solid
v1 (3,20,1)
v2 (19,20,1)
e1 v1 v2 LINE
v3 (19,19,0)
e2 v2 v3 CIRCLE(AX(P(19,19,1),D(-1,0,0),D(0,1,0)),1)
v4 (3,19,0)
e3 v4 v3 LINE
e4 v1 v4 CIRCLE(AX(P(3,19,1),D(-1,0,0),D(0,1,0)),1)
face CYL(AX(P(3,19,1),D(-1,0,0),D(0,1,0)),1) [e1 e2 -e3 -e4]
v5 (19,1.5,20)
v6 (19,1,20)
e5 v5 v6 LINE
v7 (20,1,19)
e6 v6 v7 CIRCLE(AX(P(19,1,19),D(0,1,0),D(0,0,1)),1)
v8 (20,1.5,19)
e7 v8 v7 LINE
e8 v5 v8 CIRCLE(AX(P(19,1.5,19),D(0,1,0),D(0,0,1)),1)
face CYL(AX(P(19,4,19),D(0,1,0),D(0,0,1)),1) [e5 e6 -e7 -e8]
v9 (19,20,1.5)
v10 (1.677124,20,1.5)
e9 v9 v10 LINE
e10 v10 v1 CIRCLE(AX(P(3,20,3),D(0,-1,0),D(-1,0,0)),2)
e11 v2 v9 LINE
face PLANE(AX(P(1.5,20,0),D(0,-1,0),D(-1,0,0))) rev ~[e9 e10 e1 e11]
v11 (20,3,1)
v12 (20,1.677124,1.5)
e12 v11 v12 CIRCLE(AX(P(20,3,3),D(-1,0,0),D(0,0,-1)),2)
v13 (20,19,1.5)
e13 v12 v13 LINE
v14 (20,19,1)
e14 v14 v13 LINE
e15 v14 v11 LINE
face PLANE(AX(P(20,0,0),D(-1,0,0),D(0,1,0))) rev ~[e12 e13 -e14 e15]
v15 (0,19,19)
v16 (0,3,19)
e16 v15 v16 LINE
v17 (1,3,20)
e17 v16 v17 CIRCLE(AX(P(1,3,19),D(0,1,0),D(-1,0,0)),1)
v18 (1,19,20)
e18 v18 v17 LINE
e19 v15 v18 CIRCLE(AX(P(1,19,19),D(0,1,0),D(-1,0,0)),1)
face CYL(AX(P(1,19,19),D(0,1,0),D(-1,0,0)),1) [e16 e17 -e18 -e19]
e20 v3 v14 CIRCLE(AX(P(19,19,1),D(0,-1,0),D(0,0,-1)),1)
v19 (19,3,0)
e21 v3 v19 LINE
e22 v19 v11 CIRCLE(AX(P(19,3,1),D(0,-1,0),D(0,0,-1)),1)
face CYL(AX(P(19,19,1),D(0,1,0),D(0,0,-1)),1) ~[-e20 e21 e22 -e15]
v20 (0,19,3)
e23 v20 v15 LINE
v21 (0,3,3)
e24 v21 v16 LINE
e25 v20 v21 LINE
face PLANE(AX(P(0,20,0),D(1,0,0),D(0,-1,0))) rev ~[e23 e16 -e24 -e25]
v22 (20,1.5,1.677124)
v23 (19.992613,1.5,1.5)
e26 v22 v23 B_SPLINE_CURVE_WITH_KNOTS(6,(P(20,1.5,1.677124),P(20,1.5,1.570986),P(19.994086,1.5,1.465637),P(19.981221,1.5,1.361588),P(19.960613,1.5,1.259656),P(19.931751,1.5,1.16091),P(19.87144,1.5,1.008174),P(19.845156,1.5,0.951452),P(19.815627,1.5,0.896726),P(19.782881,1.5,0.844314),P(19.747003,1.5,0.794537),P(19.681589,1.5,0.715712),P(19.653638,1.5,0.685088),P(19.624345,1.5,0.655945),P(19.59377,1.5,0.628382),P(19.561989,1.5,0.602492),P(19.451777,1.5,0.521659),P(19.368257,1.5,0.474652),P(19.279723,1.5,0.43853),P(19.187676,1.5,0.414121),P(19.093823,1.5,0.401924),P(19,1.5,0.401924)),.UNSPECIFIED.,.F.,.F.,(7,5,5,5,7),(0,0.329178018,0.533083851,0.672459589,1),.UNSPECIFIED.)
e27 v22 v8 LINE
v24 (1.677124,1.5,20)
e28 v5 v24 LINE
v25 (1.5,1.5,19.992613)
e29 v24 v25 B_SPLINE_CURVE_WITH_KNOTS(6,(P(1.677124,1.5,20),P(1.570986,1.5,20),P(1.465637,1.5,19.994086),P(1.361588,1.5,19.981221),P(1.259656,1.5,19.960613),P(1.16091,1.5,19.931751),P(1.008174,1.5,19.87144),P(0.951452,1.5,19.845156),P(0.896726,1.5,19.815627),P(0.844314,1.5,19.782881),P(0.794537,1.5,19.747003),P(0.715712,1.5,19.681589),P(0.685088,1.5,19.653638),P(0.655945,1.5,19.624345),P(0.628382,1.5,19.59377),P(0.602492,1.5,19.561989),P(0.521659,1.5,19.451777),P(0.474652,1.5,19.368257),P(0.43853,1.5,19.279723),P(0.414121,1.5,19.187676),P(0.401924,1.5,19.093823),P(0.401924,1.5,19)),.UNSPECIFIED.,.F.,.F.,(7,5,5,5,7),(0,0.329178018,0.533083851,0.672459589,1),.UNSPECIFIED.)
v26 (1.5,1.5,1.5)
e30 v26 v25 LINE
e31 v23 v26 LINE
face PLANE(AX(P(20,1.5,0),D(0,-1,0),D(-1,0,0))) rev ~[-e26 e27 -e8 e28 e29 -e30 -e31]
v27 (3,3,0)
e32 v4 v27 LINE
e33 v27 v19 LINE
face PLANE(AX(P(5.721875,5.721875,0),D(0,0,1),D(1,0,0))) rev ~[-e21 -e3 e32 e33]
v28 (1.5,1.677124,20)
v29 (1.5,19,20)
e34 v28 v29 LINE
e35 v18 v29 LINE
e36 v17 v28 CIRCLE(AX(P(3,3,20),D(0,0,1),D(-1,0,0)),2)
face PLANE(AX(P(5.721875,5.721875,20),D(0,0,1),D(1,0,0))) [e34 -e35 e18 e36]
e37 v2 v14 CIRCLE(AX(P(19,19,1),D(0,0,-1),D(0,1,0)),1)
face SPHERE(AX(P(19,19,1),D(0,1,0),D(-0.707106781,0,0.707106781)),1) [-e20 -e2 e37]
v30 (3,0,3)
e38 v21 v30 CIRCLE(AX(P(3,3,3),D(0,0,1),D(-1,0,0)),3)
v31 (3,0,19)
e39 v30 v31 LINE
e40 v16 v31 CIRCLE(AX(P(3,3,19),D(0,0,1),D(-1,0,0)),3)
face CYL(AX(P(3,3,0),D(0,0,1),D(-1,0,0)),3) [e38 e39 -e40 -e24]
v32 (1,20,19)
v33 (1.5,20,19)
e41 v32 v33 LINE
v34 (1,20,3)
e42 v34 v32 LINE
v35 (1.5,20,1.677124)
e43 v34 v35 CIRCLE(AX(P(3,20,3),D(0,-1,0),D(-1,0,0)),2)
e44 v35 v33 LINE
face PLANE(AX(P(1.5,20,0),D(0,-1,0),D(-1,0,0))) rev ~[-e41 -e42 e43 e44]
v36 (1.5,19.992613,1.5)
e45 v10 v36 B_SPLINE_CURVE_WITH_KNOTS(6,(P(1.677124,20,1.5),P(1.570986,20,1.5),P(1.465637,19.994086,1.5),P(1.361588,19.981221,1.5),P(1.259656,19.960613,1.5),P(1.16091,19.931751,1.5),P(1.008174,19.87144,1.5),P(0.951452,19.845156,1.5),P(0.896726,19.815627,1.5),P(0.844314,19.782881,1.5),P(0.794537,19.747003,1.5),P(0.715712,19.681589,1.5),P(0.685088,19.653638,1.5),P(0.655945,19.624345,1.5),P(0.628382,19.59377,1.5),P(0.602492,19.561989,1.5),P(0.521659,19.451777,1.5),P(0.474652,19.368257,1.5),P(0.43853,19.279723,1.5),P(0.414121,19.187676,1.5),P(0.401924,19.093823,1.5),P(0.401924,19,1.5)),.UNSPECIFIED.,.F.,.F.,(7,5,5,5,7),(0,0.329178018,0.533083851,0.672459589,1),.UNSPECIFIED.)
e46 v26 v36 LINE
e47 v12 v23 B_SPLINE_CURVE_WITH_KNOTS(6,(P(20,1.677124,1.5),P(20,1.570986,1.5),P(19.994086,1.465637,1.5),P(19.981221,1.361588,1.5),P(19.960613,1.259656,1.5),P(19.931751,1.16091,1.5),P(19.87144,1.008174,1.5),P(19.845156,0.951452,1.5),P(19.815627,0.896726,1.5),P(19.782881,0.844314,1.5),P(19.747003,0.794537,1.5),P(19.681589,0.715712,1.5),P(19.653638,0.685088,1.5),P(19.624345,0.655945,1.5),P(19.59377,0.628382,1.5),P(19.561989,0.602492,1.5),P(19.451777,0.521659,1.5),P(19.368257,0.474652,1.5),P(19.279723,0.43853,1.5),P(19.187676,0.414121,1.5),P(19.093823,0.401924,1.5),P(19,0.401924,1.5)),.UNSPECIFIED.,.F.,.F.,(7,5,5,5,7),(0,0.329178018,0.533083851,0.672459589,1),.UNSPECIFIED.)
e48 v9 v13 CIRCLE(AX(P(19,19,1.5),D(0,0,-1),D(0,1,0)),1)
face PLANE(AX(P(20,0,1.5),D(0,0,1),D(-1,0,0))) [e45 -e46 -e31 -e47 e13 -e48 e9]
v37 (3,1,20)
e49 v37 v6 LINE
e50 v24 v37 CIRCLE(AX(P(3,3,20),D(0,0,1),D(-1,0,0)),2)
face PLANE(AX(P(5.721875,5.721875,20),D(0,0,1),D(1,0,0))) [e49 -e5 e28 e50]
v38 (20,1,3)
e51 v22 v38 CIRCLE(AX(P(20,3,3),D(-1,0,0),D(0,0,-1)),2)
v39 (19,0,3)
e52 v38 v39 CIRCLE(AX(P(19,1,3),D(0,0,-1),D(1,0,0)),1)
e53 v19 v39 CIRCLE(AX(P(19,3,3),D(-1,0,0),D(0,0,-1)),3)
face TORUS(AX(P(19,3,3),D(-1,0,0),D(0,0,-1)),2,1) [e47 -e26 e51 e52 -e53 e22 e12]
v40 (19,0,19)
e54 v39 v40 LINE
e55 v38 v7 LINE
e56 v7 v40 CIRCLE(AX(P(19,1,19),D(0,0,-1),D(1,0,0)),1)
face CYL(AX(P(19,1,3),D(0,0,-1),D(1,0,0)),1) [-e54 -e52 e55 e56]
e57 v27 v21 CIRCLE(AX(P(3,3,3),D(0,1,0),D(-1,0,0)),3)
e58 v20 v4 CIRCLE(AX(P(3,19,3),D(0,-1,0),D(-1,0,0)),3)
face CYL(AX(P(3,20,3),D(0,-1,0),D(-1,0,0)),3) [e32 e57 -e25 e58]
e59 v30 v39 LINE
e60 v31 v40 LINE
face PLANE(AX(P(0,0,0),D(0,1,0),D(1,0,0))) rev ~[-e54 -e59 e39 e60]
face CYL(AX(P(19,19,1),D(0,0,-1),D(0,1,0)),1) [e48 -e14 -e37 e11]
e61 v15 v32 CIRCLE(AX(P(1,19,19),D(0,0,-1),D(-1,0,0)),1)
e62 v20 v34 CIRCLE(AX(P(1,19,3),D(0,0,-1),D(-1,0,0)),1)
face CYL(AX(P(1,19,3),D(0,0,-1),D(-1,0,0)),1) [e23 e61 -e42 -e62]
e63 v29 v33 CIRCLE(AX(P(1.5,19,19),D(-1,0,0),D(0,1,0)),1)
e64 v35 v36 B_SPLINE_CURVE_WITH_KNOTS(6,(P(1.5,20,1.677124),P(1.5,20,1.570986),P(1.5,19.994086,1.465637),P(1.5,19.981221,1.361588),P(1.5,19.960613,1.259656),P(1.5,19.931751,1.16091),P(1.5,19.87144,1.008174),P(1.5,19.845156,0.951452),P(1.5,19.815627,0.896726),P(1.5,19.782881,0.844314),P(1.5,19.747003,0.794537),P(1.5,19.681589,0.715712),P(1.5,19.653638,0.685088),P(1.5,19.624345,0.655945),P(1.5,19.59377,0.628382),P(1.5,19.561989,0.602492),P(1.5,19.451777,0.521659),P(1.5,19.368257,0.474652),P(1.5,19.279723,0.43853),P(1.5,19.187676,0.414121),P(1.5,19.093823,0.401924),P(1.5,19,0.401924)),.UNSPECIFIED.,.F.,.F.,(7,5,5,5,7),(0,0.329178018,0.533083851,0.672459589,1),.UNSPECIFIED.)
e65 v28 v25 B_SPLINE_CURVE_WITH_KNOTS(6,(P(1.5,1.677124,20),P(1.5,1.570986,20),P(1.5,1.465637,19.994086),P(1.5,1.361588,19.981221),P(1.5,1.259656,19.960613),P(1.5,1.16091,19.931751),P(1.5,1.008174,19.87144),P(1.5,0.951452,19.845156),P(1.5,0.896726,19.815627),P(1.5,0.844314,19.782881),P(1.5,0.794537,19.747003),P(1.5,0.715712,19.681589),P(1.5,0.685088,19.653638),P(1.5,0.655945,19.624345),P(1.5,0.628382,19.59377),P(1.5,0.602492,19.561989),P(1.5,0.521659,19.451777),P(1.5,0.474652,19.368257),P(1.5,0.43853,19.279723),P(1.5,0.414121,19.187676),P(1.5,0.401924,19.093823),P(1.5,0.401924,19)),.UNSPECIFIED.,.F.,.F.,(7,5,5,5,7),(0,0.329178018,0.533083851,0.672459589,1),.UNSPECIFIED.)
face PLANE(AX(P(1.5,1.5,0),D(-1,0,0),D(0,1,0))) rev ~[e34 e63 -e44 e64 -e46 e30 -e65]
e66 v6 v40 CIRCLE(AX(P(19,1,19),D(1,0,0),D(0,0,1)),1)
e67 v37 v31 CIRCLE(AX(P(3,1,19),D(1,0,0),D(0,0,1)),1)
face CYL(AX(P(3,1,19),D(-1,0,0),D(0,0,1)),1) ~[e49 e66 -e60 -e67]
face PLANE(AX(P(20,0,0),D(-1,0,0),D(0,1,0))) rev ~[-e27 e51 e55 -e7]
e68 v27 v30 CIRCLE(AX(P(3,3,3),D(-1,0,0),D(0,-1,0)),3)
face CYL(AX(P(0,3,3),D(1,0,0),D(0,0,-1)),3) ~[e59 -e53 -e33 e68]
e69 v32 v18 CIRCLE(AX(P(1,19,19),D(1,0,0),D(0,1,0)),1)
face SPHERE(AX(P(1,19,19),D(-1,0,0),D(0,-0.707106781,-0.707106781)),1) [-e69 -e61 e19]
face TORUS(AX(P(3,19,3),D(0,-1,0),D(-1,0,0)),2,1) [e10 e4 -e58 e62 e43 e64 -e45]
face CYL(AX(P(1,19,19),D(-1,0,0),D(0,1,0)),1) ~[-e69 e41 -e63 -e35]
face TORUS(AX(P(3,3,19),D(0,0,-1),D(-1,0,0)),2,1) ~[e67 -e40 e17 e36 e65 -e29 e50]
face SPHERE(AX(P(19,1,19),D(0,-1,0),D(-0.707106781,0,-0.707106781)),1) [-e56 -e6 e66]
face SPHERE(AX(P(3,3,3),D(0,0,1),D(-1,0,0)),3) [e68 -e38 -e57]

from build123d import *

# Parameters (mm, degrees)
F1_DEPTH     = 20
F3_DEPTH     = 20
F4_R         = 3
F5_T1_DEPTH  = 16
F5_T3_DEPTH  = 16
F5_T5_DEPTH  = 3
F5_T7_DEPTH  = 3
F5_T9_DEPTH  = 3
F5_T11_DEPTH = 16
F5_S15_W     = 1
F5_S15_H     = 1
F5_T16_DEPTH = 1
F5_S21_W     = 1
F5_S21_H     = 1
F5_T22_DEPTH = 1
F5_S27_W     = 1
F5_S27_H     = 1
F5_T28_DEPTH = 1
F5_T32_ANGLE = 90
F5_T34_ANGLE = 90
F5_T36_ANGLE = 90


# Not quite as in the source:
# - a fillet or chamfer that OpenCascade refuses, or shapes differently, is made with other operations: its cross-section is extruded or revolved along the edge and cut away or added


with BuildPart() as f1:
    # F0 (on Top) → F1 (new body)
    with BuildSketch(Plane.XY):
        Polygon((0, 20), (0, 0), (20, 0), (20, 1.5), (1.5, 1.5), (1.5, 20), align=None)
    extrude(amount=F1_DEPTH)

    # F2 (on Front) → F3 (join)
    with BuildSketch(Plane.XZ):
        Polygon((0, 20), (0, 0), (20, 0), (20, 1.5), (1.5, 1.5), (1.5, 20), align=None)
    extrude(amount=-F3_DEPTH)

    # F4
    f4_edges = [f1.edges().sort_by_distance(p)[0] for p in [
        (0, 0, 10),
        (0, 10, 0),
        (10, 0, 0),
    ]]
    fillet(f4_edges, radius=F4_R)

    # F5: fillet of radius 1 on 12 edges, made by hand

    # F5_s2 → F5_t1 (cut)
    with BuildSketch(Plane.XZ.offset(-19)):
        with BuildLine():
            ThreePointArc((0, 19), (0.2928932188, 19.7071067812), (1, 20))
            Line((1, 20), (0, 20))
            Line((0, 20), (0, 19))
        make_face()
        with BuildLine():
            ThreePointArc((19, 0), (19.7071067812, 0.2928932188), (20, 1))
            Line((20, 1), (20, 0))
            Line((20, 0), (19, 0))
        make_face()
    extrude(amount=F5_T1_DEPTH, mode=Mode.SUBTRACT)

    # F5_s4 → F5_t3 (cut)
    with BuildSketch(Plane.YZ.offset(3)):
        with BuildLine():
            ThreePointArc((20, 1), (19.7071067812, 0.2928932188), (19, 0))
            Line((19, 0), (20, 0))
            Line((20, 0), (20, 1))
        make_face()
        with BuildLine():
            ThreePointArc((1, 20), (0.2928932188, 19.7071067812), (0, 19))
            Line((0, 19), (0, 20))
            Line((0, 20), (1, 20))
        make_face()
    extrude(amount=F5_T3_DEPTH, mode=Mode.SUBTRACT)

    # F5_s6 → F5_t5 (cut)
    with BuildSketch(Plane.YZ.offset(1)):
        with BuildLine():
            ThreePointArc((20, 19), (19.7071067812, 19.7071067812), (19, 20))
            Line((19, 20), (20, 20))
            Line((20, 20), (20, 19))
        make_face()
    extrude(amount=F5_T5_DEPTH, mode=Mode.SUBTRACT)

    # F5_s8 → F5_t7 (cut)
    with BuildSketch(Plane.XY.offset(1)):
        with BuildLine():
            ThreePointArc((19, 20), (19.7071067812, 19.7071067812), (20, 19))
            Line((20, 19), (20, 20))
            Line((20, 20), (19, 20))
        make_face()
    extrude(amount=F5_T7_DEPTH, mode=Mode.SUBTRACT)

    # F5_s10 → F5_t9 (cut)
    with BuildSketch(Plane.XZ.offset(-4)):
        with BuildLine():
            ThreePointArc((19, 20), (19.7071067812, 19.7071067812), (20, 19))
            Line((20, 19), (20, 20))
            Line((20, 20), (19, 20))
        make_face()
    extrude(amount=F5_T9_DEPTH, mode=Mode.SUBTRACT)

    # F5_s12 → F5_t11 (cut)
    with BuildSketch(Plane.XY.offset(3)):
        with BuildLine():
            ThreePointArc((0, 19), (0.2928932188, 19.7071067812), (1, 20))
            Line((1, 20), (0, 20))
            Line((0, 20), (0, 19))
        make_face()
        with BuildLine():
            ThreePointArc((20, 1), (19.7071067812, 0.2928932188), (19, 0))
            Line((19, 0), (20, 0))
            Line((20, 0), (20, 1))
        make_face()
    extrude(amount=F5_T11_DEPTH, mode=Mode.SUBTRACT)


with BuildPart() as f5_tool14:
    # F5_s15 → F5_t16 (new body)
    with BuildSketch(Plane.YZ.offset(1)):
        with Locations((19.5, 19.5)):
            Rectangle(F5_S15_W, F5_S15_H)
    extrude(amount=-F5_T16_DEPTH)

    # F5_s17 → F5_t18 (revolve, cut)
    with BuildSketch(Plane(origin=(1, 19, 19), x_dir=(0, -0.7071067812, -0.7071067812), z_dir=(0, 0.7071067812, -0.7071067812))):
        with BuildLine():
            ThreePointArc((0, -1), (1, 0), (0, 1))
            Line((0, 1), (0, -1))
        make_face()
    revolve(axis=Axis((1, 19, 19), (-1, 0, 0)), mode=Mode.SUBTRACT)


with BuildPart() as f1_1:
    add(f1.part)

    # F5_t13: cut F5_tool14
    add(f5_tool14.part, mode=Mode.SUBTRACT)


with BuildPart() as f5_tool20:
    # F5_s21 → F5_t22 (new body)
    with BuildSketch(Plane.XZ.offset(-19)):
        with Locations((19.5, 0.5)):
            Rectangle(F5_S21_W, F5_S21_H)
    extrude(amount=-F5_T22_DEPTH)

    # F5_s23 → F5_t24 (revolve, cut)
    with BuildSketch(Plane(origin=(19, 19, 1), x_dir=(-0.7071067812, 0, 0.7071067812), z_dir=(-0.7071067812, 0, -0.7071067812))):
        with BuildLine():
            ThreePointArc((0, -1), (1, 0), (0, 1))
            Line((0, 1), (0, -1))
        make_face()
    revolve(axis=Axis((19, 19, 1), (0, 1, 0)), mode=Mode.SUBTRACT)


with BuildPart() as f1_2:
    add(f1_1.part)

    # F5_t19: cut F5_tool20
    add(f5_tool20.part, mode=Mode.SUBTRACT)


with BuildPart() as f5_tool26:
    # F5_s27 → F5_t28 (new body)
    with BuildSketch(Plane.XZ.offset(-1)):
        with Locations((19.5, 19.5)):
            Rectangle(F5_S27_W, F5_S27_H)
    extrude(amount=F5_T28_DEPTH)

    # F5_s29 → F5_t30 (revolve, cut)
    with BuildSketch(Plane(origin=(19, 1, 19), x_dir=(-0.7071067812, 0, -0.7071067812), z_dir=(-0.7071067812, 0, 0.7071067812))):
        with BuildLine():
            ThreePointArc((0, -1), (1, 0), (0, 1))
            Line((0, 1), (0, -1))
        make_face()
    revolve(axis=Axis((19, 1, 19), (0, -1, 0)), mode=Mode.SUBTRACT)


with BuildPart() as f1_3:
    add(f1_2.part)

    # F5_t25: cut F5_tool26
    add(f5_tool26.part, mode=Mode.SUBTRACT)

    # F5_s31 → F5_t32 (revolve, cut)
    with BuildSketch(Plane.XY.offset(3)):
        with BuildLine():
            ThreePointArc((1, 20), (0.2928932188, 19.7071067812), (0, 19))
            Line((0, 19), (0, 20))
            Line((0, 20), (1, 20))
        make_face()
    revolve(axis=Axis((3, 20, 3), (0, -1, 0)), revolution_arc=F5_T32_ANGLE, mode=Mode.SUBTRACT)

    # F5_s33 → F5_t34 (revolve, cut)
    with BuildSketch(Plane.XZ.offset(-3)):
        with BuildLine():
            ThreePointArc((1, 20), (0.2928932188, 19.7071067812), (0, 19))
            Line((0, 19), (0, 20))
            Line((0, 20), (1, 20))
        make_face()
    revolve(axis=Axis((3, 3, 20), (0, 0, 1)), revolution_arc=F5_T34_ANGLE, mode=Mode.SUBTRACT)

    # F5_s35 → F5_t36 (revolve, cut)
    with BuildSketch(Plane.XZ.offset(-3)):
        with BuildLine():
            ThreePointArc((20, 1), (19.7071067812, 0.2928932188), (19, 0))
            Line((19, 0), (20, 0))
            Line((20, 0), (20, 1))
        make_face()
    revolve(axis=Axis((20, 3, 3), (-1, 0, 0)), revolution_arc=F5_T36_ANGLE, mode=Mode.SUBTRACT)


solid = f1_3.part
